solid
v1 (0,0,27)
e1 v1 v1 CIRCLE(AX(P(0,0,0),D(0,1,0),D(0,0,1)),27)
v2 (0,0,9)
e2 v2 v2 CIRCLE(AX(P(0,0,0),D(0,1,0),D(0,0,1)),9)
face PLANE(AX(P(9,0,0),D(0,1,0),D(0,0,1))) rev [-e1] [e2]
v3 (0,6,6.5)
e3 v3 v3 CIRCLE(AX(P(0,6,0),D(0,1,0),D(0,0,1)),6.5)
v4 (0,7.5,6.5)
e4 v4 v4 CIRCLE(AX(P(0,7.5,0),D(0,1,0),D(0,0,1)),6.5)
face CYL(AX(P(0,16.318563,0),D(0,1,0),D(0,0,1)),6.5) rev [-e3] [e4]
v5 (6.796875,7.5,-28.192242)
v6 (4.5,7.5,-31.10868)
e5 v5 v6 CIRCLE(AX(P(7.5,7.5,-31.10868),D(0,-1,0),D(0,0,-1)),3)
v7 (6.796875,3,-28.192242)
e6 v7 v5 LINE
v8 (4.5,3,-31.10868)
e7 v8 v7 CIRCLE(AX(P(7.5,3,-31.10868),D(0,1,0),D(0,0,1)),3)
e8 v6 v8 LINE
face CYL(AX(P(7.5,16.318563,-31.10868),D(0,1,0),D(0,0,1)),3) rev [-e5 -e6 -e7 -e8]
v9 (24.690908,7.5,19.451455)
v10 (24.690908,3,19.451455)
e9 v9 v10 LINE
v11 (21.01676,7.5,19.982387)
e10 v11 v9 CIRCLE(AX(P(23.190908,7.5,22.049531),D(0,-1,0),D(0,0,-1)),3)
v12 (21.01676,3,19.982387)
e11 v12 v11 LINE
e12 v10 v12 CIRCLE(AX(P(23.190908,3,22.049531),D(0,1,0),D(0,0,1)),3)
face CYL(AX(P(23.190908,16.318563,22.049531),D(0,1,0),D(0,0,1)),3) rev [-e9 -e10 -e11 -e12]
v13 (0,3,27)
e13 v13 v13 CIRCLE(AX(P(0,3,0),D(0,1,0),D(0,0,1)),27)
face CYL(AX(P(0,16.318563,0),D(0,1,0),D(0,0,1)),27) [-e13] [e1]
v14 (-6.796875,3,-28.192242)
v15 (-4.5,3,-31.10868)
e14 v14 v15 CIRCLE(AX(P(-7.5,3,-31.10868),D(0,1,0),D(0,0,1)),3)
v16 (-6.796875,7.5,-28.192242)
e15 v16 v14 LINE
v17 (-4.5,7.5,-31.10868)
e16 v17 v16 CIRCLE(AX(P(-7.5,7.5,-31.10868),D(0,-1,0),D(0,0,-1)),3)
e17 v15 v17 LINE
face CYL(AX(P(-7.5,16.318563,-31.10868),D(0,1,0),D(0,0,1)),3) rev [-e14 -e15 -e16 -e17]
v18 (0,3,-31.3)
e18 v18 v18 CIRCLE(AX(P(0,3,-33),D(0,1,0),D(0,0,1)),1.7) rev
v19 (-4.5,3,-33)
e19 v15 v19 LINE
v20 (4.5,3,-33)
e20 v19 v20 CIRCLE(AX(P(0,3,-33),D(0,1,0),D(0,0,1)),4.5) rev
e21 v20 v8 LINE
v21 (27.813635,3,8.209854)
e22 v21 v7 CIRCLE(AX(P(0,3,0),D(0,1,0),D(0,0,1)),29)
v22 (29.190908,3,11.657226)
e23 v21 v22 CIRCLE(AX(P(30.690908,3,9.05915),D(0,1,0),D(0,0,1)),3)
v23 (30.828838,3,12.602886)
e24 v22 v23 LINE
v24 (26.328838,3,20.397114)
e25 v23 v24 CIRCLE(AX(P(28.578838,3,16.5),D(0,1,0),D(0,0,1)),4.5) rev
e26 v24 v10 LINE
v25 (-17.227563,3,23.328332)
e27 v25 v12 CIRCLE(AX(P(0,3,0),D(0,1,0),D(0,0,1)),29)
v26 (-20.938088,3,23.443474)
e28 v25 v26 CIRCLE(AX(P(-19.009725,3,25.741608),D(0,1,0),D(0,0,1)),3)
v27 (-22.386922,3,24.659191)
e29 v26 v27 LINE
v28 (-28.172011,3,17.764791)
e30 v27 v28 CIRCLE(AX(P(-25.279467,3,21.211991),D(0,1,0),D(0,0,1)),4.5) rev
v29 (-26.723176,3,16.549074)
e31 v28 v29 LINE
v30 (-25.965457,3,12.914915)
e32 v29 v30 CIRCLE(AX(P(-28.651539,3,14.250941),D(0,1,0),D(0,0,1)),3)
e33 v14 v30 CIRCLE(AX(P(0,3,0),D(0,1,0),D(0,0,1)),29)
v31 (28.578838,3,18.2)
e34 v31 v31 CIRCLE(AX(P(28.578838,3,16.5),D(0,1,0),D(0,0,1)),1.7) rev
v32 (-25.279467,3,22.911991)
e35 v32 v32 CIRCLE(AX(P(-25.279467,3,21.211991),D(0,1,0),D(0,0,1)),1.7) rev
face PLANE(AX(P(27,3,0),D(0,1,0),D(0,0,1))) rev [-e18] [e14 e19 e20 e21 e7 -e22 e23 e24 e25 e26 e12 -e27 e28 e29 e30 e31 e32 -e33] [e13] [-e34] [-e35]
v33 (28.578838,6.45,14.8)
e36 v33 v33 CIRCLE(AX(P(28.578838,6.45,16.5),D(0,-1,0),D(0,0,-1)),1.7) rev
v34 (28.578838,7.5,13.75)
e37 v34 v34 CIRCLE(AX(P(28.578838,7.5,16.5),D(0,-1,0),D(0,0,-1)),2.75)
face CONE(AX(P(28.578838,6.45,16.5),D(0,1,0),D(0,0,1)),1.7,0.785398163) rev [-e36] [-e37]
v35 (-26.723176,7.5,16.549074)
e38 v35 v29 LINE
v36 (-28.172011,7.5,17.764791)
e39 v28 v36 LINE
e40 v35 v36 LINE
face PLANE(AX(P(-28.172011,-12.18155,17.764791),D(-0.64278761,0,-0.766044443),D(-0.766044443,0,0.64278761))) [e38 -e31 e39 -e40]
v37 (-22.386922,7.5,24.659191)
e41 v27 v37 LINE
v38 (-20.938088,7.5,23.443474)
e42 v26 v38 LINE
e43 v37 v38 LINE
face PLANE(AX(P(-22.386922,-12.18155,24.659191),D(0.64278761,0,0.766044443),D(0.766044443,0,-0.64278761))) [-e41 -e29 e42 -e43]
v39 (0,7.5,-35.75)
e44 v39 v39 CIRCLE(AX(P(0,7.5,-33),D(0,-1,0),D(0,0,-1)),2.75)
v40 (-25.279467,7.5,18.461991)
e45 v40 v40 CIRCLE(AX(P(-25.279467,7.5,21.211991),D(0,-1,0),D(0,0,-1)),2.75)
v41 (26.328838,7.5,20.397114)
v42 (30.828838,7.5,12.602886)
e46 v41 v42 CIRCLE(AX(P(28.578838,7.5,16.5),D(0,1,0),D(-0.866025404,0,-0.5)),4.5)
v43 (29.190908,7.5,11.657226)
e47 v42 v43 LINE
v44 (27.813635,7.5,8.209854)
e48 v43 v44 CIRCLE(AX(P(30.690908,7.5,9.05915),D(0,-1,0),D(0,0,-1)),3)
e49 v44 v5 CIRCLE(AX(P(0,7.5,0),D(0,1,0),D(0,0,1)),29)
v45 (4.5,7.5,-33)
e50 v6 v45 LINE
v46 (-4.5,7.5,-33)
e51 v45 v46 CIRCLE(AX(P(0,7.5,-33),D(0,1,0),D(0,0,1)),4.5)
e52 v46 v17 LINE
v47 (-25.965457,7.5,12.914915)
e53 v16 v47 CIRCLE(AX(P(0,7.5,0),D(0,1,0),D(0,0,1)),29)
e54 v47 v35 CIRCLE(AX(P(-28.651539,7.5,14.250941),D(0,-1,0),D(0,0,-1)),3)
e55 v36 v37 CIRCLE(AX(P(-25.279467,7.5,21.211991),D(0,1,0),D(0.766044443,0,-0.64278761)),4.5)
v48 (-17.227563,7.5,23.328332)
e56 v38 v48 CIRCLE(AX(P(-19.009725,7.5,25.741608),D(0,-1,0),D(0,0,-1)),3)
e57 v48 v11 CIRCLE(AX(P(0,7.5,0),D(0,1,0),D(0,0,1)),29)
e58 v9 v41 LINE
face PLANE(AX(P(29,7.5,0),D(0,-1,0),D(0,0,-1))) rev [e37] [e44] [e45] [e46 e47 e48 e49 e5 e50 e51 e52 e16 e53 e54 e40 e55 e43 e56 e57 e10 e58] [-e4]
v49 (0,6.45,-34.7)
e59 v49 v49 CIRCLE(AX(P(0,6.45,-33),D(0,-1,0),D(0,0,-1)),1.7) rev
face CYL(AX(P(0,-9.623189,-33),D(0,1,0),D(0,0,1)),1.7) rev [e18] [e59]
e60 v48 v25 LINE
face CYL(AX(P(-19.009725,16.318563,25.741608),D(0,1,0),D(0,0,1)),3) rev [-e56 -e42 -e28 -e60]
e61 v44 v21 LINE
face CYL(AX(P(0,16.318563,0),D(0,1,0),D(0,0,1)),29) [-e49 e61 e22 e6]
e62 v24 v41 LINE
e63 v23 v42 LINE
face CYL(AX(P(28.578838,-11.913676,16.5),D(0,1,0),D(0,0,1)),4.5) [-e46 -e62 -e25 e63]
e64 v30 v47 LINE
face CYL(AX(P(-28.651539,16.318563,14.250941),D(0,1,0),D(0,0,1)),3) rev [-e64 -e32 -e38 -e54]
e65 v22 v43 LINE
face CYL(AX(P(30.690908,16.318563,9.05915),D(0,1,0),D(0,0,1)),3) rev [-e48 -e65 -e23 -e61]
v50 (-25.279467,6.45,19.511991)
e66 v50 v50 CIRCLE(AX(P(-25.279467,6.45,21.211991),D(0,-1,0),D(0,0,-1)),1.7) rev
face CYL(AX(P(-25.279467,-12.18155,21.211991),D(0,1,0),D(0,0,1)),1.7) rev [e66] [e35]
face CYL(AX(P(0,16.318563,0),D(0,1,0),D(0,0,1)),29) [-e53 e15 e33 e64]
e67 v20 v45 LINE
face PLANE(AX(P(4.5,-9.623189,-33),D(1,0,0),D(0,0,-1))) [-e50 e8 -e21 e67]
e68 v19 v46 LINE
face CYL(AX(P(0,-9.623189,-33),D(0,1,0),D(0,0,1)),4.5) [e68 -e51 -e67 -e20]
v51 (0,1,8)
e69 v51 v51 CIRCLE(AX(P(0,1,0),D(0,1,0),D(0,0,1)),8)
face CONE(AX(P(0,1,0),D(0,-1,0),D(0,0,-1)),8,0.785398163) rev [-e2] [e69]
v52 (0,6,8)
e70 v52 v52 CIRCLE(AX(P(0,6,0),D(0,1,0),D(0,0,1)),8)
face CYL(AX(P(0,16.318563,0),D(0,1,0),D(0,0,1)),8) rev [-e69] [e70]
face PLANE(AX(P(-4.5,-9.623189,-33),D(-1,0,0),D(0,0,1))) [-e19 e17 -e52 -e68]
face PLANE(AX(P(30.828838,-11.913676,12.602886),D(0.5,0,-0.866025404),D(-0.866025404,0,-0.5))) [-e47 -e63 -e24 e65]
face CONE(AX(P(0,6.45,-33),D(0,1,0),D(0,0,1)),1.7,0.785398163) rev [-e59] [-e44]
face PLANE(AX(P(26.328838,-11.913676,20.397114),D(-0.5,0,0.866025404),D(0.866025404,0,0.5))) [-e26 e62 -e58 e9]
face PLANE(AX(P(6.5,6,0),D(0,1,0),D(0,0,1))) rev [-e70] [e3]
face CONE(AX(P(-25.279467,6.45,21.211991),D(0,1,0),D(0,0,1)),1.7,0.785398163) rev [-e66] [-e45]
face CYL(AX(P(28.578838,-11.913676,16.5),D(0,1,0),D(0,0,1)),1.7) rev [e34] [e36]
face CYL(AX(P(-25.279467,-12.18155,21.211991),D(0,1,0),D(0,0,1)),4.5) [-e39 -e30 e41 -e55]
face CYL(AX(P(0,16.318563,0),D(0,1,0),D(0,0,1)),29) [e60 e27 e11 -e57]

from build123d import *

# Parameters (mm, degrees)
ESQUISSE1_R                      = 1.7
BOSS_EXTRU_1_DEPTH               = 4.5
CONG_1_R                         = 3
R_P_TITION_START                 = 3
R_P_TITION_CIRCULAIRE1_OUTLINE_R = 1.7
R_P_TITION_CIRCULAIRE1_DEPTH     = 4.5
CHANFREIN1_SIZE                  = 1.05


# Read off the part's stored shape, not the designer's step: Répétition circulaire1
with BuildPart() as part:
    # Sketch1 → Revolve1 (revolve)
    with BuildSketch(Plane.XY, mode=Mode.PRIVATE) as revolve1_sk:
        Polygon((9, 0), (27, 0), (27, 3), (29, 3), (29, 7.5), (6.5, 7.5), (6.5, 6), (8, 6), (8, 1), align=None)
    revolve(revolve1_sk.sketch.rotate(Axis((0, 16.318563478, 0), (0, -1, 0)), 90), axis=Axis((0, 16.318563478, 0), (0, -1, 0)))

    # Esquisse1 → Boss.-Extru.1 (add)
    with BuildSketch(Plane(origin=(0, 7.5, 0), x_dir=(1, 0, 0), z_dir=(0, 1, 0))):
        with BuildLine():
            Line((-4.5, 33), (-4.5, 28.648734702))
            ThreePointArc((-4.5, 28.648734702), (0, 29), (4.5, 28.648734702))
            Line((4.5, 28.648734702), (4.5, 33))
            ThreePointArc((4.5, 33), (0, 37.5), (-4.5, 33))
        make_face()
        with Locations(Location((0, 33, 0), (0, 0, 270))):
            Circle(ESQUISSE1_R, mode=Mode.SUBTRACT)
    extrude(amount=-BOSS_EXTRU_1_DEPTH)

    # Congé1
    cong_1_edges = [part.edges().sort_by_distance(p)[0] for p in [
        (-4.5, 5.25, -28.648734702),
        (4.5, 5.25, -28.648734702),
    ]]
    fillet(cong_1_edges, radius=CONG_1_R)

    # Répétition circulaire1 outline → Répétition circulaire1 (add)
    # profile 1 of 2: a face of its own
    with BuildSketch(Plane(origin=(0, 0, 0), x_dir=(1, 0, 0), z_dir=(0, 1, 0)).offset(R_P_TITION_START)):
        with BuildLine():
            ThreePointArc((26.328838325, -20.397114317), (32.475952642, -18.75), (30.828838325, -12.602885683))
            Line((30.828838325, -12.602885683), (29.190907557, -11.657225913))
            ThreePointArc((29.190907557, -11.657225913), (27.905010686, -10.172154026), (27.813634974, -8.209854417))
            ThreePointArc((27.813634974, -8.209854417), (25.11473671, -14.5), (21.016759974, -19.98238725))
            ThreePointArc((21.016759974, -19.98238725), (22.761849141, -19.080371134), (24.690907557, -19.451454547))
            Line((24.690907557, -19.451454547), (26.328838325, -20.397114317))
        make_face()
        with Locations((28.578838325, -16.5)):
            Circle(R_P_TITION_CIRCULAIRE1_OUTLINE_R, mode=Mode.SUBTRACT)
    # profile 2 of 2: a face of its own
    with BuildSketch(Plane(origin=(0, 0, 0), x_dir=(1, 0, 0), z_dir=(0, 1, 0)).offset(R_P_TITION_START)):
        with BuildLine():
            ThreePointArc((-20.938087556, -23.443474348), (-19.10277383, -22.743051047), (-17.227563034, -23.328331957))
            ThreePointArc((-17.227563034, -23.328331957), (-22.21528885, -18.640840681), (-25.965457103, -12.914915309))
            ThreePointArc((-25.965457103, -12.914915309), (-25.714694862, -14.863270403), (-26.723176043, -16.54907436))
            Line((-26.723176043, -16.54907436), (-28.172010867, -17.764791126))
            ThreePointArc((-28.172010867, -17.764791126), (-28.726666617, -24.104535364), (-22.386922379, -24.659191114))
            Line((-22.386922379, -24.659191114), (-20.938087556, -23.443474348))
        make_face()
        with Locations((-25.279466623, -21.21199112)):
            Circle(R_P_TITION_CIRCULAIRE1_OUTLINE_R, mode=Mode.SUBTRACT)
    extrude(amount=R_P_TITION_CIRCULAIRE1_DEPTH)

    # Chanfrein1
    chanfrein1_edges = [part.edges().sort_by_distance(p)[0] for p in [
        (0, 7.5, -34.7),
        (26.878838325, 7.5, 16.5),
        (-26.979466623, 7.5, 21.21199112),
    ]]
    chamfer(chanfrein1_edges, length=CHANFREIN1_SIZE)


solid = part.part
